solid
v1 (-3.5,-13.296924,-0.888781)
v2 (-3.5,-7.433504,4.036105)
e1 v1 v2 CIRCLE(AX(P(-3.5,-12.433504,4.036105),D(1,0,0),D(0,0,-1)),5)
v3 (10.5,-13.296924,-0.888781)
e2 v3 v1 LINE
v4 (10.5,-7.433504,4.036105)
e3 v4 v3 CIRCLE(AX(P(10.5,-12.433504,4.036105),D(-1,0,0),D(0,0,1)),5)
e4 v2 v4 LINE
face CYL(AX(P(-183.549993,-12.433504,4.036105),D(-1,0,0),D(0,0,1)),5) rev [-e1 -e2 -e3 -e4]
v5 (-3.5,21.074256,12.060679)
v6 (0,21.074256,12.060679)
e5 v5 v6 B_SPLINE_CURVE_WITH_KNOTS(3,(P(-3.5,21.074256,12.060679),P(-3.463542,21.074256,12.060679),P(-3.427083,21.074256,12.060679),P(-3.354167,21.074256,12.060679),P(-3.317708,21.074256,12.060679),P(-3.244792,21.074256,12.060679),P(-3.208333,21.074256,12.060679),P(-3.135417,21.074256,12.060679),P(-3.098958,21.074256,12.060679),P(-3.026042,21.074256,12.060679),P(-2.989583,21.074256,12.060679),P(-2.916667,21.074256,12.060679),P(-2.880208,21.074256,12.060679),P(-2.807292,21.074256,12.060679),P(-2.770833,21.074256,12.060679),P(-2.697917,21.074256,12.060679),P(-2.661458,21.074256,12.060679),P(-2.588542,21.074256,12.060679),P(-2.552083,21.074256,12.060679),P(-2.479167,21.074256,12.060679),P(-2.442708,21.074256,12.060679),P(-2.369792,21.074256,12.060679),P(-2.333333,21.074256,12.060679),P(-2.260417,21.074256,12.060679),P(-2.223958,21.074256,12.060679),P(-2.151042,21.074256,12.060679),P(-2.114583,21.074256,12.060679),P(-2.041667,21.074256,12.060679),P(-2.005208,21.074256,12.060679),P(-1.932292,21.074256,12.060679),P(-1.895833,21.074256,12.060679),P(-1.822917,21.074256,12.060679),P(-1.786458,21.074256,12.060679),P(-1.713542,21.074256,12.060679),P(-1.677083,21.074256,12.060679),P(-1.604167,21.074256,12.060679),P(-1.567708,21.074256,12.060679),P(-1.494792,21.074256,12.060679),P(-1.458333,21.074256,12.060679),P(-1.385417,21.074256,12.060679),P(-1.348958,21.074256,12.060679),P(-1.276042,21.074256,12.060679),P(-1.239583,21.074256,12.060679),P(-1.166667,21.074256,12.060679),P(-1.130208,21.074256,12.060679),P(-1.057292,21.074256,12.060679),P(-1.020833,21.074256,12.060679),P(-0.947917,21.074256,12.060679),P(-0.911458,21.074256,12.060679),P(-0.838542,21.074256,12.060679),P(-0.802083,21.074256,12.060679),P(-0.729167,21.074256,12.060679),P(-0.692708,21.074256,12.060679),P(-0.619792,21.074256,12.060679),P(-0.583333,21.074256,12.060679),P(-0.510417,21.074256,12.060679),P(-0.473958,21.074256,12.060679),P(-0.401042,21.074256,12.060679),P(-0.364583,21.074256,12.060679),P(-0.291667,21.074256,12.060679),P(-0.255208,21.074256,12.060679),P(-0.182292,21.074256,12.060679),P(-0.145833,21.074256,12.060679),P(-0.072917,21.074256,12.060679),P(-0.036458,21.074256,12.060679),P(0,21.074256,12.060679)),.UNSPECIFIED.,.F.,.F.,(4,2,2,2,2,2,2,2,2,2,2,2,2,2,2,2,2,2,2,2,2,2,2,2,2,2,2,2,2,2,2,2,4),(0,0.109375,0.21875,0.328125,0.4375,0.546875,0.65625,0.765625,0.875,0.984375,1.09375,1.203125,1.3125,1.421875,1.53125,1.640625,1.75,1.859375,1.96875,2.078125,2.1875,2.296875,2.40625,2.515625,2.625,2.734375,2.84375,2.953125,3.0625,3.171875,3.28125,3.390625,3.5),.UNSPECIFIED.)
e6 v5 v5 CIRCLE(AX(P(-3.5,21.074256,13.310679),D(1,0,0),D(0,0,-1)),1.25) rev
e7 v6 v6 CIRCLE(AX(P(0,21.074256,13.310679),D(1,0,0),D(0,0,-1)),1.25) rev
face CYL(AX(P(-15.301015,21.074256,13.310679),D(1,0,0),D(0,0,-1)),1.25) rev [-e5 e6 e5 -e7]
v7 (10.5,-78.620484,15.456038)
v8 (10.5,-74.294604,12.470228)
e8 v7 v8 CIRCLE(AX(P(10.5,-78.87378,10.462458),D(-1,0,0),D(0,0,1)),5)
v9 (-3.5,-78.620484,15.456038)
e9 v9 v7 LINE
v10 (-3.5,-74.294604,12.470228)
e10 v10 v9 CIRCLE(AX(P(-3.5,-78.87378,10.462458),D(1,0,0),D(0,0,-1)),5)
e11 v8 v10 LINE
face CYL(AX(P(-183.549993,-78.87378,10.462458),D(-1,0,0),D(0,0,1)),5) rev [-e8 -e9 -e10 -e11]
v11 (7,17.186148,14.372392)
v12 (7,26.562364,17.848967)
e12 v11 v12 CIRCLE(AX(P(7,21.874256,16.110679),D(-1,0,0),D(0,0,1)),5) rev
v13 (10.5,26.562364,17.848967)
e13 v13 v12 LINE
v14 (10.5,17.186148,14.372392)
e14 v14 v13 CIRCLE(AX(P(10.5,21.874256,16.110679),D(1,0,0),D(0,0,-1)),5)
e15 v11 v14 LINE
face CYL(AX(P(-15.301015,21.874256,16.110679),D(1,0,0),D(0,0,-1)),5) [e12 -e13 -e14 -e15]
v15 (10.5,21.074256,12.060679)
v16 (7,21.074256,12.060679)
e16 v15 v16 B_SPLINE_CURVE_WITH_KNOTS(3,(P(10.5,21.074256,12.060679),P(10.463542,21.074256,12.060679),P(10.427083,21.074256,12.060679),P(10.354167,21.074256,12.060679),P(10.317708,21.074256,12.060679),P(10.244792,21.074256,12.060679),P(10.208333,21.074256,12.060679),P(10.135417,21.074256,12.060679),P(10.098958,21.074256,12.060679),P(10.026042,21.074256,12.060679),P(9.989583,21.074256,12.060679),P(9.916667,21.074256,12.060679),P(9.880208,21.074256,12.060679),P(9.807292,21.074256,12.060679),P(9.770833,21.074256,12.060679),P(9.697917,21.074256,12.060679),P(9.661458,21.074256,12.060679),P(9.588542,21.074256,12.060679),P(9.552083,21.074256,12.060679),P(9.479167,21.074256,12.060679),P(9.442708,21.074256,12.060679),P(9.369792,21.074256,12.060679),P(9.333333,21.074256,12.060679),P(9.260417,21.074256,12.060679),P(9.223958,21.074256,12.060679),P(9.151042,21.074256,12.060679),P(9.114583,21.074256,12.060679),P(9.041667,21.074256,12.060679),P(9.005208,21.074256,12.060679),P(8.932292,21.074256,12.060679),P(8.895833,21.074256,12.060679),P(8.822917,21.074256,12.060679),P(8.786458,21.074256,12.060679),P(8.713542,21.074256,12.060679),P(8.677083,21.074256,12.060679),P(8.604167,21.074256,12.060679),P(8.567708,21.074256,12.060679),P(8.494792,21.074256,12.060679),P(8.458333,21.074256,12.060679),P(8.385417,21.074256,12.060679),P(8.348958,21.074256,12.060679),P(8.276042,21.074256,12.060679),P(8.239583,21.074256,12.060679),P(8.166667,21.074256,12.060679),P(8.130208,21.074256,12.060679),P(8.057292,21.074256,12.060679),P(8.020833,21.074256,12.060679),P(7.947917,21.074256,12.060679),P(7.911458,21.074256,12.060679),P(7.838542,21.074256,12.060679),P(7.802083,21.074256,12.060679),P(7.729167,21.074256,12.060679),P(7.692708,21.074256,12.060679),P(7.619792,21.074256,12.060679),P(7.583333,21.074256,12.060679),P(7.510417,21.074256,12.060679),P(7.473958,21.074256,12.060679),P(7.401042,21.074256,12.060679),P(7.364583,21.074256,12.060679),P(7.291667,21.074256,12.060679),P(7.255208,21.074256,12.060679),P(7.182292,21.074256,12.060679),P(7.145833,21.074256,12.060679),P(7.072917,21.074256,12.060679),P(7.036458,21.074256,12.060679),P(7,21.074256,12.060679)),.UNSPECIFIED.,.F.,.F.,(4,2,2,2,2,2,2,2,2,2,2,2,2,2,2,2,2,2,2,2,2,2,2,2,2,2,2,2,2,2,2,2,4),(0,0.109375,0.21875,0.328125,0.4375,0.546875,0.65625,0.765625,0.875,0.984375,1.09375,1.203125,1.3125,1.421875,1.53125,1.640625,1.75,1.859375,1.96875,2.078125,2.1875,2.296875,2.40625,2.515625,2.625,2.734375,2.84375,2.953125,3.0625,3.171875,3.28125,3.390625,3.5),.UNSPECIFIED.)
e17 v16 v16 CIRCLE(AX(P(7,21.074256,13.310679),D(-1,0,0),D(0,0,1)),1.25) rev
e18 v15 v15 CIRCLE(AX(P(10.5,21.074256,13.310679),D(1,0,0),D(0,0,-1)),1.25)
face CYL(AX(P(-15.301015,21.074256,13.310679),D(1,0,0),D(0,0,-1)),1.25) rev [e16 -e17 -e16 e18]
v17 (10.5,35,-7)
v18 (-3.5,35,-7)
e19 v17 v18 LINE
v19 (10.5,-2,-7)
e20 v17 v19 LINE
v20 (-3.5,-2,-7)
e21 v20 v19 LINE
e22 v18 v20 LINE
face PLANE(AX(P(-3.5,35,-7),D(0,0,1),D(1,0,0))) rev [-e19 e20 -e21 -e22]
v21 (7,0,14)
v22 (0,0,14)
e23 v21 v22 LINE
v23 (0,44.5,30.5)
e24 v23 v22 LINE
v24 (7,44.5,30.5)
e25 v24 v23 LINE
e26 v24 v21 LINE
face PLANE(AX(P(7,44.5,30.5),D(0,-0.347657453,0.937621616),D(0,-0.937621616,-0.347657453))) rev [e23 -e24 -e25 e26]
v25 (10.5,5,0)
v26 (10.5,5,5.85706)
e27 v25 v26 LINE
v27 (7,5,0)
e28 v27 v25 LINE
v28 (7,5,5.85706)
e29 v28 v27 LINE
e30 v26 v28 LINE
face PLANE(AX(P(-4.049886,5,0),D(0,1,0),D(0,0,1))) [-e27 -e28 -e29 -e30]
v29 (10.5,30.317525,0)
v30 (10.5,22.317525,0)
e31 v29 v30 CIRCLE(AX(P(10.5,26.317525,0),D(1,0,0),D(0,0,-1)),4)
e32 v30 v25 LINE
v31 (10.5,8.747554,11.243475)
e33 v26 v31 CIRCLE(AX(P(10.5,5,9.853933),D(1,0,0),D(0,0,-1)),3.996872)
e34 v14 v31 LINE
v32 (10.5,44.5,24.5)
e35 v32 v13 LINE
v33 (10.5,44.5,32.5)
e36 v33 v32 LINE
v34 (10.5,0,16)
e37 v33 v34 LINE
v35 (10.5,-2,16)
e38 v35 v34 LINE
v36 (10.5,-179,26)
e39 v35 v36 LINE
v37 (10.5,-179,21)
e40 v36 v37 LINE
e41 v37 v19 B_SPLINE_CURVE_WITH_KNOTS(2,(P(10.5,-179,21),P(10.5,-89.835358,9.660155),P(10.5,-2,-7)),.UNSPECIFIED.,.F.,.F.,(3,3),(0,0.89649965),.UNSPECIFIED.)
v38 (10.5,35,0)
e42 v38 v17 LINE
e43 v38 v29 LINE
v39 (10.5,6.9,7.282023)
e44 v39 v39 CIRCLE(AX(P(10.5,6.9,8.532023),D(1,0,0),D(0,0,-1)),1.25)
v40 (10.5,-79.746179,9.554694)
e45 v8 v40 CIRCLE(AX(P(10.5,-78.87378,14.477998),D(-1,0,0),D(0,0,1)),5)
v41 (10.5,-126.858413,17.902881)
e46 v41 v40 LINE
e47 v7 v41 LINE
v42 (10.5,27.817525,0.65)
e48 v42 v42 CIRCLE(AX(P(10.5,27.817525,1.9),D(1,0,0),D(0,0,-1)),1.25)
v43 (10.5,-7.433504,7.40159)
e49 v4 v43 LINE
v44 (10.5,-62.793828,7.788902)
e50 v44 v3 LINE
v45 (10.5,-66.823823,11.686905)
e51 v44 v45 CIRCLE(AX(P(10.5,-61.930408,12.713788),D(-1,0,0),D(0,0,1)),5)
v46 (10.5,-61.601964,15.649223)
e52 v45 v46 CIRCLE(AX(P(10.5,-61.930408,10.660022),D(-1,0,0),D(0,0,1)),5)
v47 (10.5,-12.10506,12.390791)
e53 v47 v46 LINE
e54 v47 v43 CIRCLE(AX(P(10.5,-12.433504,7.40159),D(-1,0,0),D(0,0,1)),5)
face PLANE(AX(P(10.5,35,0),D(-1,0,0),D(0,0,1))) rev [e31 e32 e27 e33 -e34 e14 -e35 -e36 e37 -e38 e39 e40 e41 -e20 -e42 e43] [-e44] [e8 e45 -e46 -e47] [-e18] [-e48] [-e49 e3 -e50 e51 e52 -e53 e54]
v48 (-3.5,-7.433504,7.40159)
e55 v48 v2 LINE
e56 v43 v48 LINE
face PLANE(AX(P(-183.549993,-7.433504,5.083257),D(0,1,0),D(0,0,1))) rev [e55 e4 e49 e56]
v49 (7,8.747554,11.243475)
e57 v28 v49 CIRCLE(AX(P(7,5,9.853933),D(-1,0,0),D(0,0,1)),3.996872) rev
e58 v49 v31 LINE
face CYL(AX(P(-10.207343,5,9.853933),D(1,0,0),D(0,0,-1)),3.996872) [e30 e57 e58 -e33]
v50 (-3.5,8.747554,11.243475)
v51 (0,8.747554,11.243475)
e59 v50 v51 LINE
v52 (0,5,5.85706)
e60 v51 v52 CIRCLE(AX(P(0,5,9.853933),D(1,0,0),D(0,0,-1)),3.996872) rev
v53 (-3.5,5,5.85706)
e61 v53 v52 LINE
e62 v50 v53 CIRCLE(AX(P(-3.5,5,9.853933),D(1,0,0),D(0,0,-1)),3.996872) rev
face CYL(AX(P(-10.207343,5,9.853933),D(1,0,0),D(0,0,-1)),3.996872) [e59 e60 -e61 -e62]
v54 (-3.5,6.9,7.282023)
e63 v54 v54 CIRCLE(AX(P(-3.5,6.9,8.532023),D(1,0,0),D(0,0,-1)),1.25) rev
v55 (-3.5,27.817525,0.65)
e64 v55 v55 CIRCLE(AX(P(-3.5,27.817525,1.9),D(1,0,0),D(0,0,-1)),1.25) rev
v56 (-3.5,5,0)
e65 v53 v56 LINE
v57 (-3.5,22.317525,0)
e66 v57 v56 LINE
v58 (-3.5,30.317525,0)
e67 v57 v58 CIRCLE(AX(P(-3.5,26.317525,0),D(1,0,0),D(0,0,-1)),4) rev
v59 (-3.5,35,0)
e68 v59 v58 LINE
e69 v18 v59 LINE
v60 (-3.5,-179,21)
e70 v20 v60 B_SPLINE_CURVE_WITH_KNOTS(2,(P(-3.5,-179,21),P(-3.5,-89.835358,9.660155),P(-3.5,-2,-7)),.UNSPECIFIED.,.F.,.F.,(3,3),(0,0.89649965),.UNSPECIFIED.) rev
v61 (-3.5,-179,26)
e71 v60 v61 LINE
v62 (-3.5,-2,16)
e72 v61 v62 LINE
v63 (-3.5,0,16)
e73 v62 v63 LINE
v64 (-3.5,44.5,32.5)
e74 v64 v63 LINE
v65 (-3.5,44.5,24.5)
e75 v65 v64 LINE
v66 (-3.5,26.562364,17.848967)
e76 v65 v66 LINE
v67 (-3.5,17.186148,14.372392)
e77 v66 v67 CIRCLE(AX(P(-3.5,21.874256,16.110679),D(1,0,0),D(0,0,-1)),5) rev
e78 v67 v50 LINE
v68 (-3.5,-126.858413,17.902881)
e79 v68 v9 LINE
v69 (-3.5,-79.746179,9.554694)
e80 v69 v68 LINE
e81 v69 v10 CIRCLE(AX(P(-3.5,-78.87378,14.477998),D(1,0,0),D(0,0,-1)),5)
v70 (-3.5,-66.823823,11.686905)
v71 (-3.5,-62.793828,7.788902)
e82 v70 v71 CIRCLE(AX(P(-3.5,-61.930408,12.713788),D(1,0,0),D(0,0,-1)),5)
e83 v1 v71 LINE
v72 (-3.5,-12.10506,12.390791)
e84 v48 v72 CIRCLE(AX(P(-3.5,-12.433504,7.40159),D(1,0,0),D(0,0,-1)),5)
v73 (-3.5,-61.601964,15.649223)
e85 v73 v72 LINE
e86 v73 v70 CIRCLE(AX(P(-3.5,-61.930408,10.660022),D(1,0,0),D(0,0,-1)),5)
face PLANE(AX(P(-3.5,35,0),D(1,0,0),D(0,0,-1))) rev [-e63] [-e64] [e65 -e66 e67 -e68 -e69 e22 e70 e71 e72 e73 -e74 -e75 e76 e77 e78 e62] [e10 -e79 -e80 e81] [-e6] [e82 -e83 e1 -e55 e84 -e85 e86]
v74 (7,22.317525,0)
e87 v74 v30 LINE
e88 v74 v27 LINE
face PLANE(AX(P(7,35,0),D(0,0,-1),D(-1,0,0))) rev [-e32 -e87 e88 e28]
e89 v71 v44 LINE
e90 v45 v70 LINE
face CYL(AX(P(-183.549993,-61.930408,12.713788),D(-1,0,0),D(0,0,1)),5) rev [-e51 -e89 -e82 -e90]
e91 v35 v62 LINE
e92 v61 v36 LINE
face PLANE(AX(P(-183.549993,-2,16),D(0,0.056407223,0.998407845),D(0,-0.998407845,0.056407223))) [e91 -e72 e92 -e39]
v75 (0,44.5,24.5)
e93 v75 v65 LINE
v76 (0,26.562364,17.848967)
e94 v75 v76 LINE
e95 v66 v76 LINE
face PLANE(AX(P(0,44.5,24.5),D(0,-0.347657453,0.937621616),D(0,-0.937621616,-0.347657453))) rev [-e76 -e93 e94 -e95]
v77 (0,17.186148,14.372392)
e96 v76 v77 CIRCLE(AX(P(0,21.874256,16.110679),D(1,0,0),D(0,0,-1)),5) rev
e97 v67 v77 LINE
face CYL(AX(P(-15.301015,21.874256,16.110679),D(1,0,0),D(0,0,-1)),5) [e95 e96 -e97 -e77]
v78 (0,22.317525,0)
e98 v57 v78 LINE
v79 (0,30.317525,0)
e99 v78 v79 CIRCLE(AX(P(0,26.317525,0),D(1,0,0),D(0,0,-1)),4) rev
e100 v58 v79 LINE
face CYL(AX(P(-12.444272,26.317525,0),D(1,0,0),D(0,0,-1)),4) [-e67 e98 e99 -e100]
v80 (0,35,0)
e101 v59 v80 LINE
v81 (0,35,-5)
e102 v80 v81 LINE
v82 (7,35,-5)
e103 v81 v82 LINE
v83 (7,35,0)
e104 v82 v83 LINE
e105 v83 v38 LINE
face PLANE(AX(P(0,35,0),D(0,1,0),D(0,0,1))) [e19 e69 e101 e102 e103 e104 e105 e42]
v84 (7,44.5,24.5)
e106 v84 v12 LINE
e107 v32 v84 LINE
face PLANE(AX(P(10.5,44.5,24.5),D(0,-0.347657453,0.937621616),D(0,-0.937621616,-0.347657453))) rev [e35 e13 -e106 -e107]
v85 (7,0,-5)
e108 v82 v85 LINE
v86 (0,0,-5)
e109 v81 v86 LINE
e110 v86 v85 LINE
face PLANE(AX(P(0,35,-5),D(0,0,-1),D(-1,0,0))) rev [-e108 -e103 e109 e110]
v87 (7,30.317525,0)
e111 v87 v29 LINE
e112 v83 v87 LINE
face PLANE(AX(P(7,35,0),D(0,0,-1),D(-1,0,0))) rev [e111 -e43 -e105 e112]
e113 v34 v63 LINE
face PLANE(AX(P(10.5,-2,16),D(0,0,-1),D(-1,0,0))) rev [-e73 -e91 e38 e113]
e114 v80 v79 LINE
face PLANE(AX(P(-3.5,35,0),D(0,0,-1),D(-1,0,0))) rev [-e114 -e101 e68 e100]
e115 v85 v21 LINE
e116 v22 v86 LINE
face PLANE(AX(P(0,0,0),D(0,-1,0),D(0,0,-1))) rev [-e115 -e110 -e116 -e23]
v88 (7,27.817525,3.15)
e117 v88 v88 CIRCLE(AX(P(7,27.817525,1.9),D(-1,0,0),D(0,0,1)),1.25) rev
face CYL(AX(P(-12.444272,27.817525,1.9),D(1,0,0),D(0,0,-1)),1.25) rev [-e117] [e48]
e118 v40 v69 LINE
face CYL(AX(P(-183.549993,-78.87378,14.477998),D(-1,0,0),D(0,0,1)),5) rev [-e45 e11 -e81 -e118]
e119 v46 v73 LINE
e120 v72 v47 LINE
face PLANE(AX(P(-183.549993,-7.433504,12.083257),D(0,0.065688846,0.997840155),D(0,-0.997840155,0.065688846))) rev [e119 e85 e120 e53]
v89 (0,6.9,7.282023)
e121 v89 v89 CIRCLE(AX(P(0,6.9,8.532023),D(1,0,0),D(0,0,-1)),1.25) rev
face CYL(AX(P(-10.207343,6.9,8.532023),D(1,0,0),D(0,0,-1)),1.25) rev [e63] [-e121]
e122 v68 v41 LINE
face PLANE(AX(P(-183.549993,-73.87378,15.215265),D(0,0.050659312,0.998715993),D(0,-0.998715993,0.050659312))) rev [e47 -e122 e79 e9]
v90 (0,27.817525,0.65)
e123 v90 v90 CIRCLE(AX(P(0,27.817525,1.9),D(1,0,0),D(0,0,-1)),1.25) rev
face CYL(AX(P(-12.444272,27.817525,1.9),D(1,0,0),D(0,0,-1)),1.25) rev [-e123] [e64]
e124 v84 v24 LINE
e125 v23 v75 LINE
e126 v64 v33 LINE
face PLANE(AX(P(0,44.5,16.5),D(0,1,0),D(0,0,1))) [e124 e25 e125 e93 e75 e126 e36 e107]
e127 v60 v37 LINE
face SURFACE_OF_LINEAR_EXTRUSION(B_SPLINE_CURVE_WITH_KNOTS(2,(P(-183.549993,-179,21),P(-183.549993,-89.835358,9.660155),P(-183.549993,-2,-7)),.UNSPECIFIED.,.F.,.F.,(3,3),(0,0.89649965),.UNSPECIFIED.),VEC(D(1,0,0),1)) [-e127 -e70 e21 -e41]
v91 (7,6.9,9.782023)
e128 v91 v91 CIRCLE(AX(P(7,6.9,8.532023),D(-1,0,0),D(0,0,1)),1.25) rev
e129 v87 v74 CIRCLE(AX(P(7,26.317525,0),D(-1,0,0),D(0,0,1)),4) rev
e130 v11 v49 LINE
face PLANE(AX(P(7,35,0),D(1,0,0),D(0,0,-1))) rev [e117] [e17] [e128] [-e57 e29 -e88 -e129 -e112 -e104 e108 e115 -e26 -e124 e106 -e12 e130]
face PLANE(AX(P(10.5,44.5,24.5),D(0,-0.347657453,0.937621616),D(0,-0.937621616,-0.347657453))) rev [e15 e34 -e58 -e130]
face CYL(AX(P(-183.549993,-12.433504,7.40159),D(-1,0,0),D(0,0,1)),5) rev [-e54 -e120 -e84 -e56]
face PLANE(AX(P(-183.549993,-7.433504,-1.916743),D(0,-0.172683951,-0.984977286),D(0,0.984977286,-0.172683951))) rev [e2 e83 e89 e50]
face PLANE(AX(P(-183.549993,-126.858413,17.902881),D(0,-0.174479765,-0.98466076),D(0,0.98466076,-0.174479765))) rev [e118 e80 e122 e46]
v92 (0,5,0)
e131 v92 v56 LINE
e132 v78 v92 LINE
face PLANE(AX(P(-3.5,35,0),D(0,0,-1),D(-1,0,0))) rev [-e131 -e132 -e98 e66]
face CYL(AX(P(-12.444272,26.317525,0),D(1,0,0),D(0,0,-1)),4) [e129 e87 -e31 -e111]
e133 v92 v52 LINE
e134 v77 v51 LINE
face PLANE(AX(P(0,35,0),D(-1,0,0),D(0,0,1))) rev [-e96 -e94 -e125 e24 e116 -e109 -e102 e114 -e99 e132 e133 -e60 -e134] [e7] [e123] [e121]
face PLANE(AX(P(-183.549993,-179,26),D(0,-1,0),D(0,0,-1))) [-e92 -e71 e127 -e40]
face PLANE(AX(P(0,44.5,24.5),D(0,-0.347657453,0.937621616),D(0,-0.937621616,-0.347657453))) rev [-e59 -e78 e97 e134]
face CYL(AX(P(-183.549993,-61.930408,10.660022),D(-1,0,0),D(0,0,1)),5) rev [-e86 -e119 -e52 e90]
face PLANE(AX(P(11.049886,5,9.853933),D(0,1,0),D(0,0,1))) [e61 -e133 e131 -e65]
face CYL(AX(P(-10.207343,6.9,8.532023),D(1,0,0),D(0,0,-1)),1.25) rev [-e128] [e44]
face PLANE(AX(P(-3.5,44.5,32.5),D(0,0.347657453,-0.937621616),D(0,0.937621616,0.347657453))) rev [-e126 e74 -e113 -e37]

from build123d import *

# Parameters (mm, degrees)
BOSS_EXTRUDE1_DEPTH  = 35
SKETCH6_W            = 14
SKETCH6_H            = 23
BOSS_EXTRUDE6_DEPTH  = 2
BOSS_EXTRUDE8_DEPTH  = 3.5
BOSS_EXTRUDE9_START  = -14
SKETCH14_R           = 1.25
BOSS_EXTRUDE9_DEPTH  = 14
BOSS_EXTRUDE10_DEPTH = 3.5
BOSS_EXTRUDE11_START = -14
SKETCH16_R           = 1.25
BOSS_EXTRUDE11_DEPTH = 14
BOSS_EXTRUDE12_START = -14
SKETCH18_R           = 1.25
BOSS_EXTRUDE12_DEPTH = 14
SKETCH19_W           = 7
SKETCH19_H           = 19
CUT_EXTRUDE5_DEPTH   = 57.095900028
SKETCH20_W           = 7
SKETCH20_H           = 47.4605099
CUT_EXTRUDE6_DEPTH   = 10
BOSS_EXTRUDE13_DEPTH = 14
FILLET1_R            = 5


with BuildPart() as part:
    # Sketch1 → Boss-Extrude1 (new body)
    with BuildSketch(Plane(origin=(0, 0, 0), x_dir=(1, 0, 0), z_dir=(0, 1, 0))):
        Polygon((7, 0), (10.5, 0), (10.5, 7), (-3.5, 7), (-3.5, 0), (0, 0), (0, 5), (7, 5), align=None)
    extrude(amount=BOSS_EXTRUDE1_DEPTH)

    # Sketch6 → Boss-Extrude6 (add)
    with BuildSketch(Plane.XZ):
        with Locations((3.5, 4.5)):
            Rectangle(SKETCH6_W, SKETCH6_H)
    extrude(amount=BOSS_EXTRUDE6_DEPTH)

    # Sweep1: sweep along a path in Sketch8
    with BuildLine(Plane(origin=(10.5, 0, 0), x_dir=(0, 0, -1), z_dir=(1, 0, 0))) as sweep1_path:
        Line((-32.5, 44.5), (-16, 0))
    # Sketch7 → Sweep1 (sweep)
    with BuildSketch(Plane(origin=(0, 0, 0), x_dir=(1, 0, 0), z_dir=(0, 1, 0))):
        Polygon((-3.5, -16), (10.5, -16), (10.5, -8), (7, -8), (7, -14), (0, -14), (0, -8), (-3.5, -8), align=None)
    sweep(path=sweep1_path.line)

    # Sketch13 → Boss-Extrude8 (add)
    with BuildSketch(Plane(origin=(10.5, 0, 0), x_dir=(0, 0, -1), z_dir=(1, 0, 0))):
        Polygon((-8, 0), (0, 0), (0, 5), (-9.853932584, 5), align=None)
    extrude(amount=-BOSS_EXTRUDE8_DEPTH)

    # Sketch14 → Boss-Extrude9 (add)
    with BuildSketch(Plane(origin=(10.5, 0, 0), x_dir=(0, 0, -1), z_dir=(1, 0, 0)).offset(BOSS_EXTRUDE9_START)):
        with BuildLine():
            Line((-9.853932584, 5), (-11.243474968, 8.747553701))
            ThreePointArc((-11.243474968, 8.747553701), (-7.571262705, 8.280915268), (-5.85706046, 5))
            Line((-5.85706046, 5), (-9.853932584, 5))
        make_face()
        with Locations((-8.532023173, 6.9)):
            Circle(SKETCH14_R, mode=Mode.SUBTRACT)
    extrude(amount=BOSS_EXTRUDE9_DEPTH)

    # Sketch15 → Boss-Extrude10 (add)
    with BuildSketch(Plane.ZY.offset(3.5)):
        Polygon((0, 0), (8, 0), (9.853932584, 5), (0, 5), align=None)
    extrude(amount=-BOSS_EXTRUDE10_DEPTH)

    # Sketch16 → Boss-Extrude11 (add)
    with BuildSketch(Plane(origin=(10.5, 0, 0), x_dir=(0, 0, -1), z_dir=(1, 0, 0)).offset(BOSS_EXTRUDE11_START)):
        with BuildLine():
            ThreePointArc((0, 30.317524518), (-4, 26.317524518), (0, 22.317524518))
            Line((0, 22.317524518), (0, 26.317524518))
            Line((0, 26.317524518), (0, 30.317524518))
        make_face()
        with Locations((-1.9, 27.817524518)):
            Circle(SKETCH16_R, mode=Mode.SUBTRACT)
    extrude(amount=BOSS_EXTRUDE11_DEPTH)

    # Sketch18 → Boss-Extrude12 (add)
    with BuildSketch(Plane(origin=(10.5, 0, 0), x_dir=(0, 0, -1), z_dir=(1, 0, 0)).offset(BOSS_EXTRUDE12_START)):
        with BuildLine():
            Line((-17.848966579, 26.562364409), (-14.372392047, 17.186148247))
            ThreePointArc((-14.372392047, 17.186148247), (-11.422571232, 23.612543594), (-17.848966579, 26.562364409))
        make_face()
        with Locations((-13.310679313, 21.074256328)):
            Circle(SKETCH18_R, mode=Mode.SUBTRACT)
    extrude(amount=BOSS_EXTRUDE12_DEPTH)

    # Sketch19 → Cut-Extrude5 (cut, through all)
    with BuildSketch(Plane(origin=(0, 0, 0), x_dir=(1, 0, 0), z_dir=(0, 1, 0))):
        with Locations((3.5, -4.5)):
            Rectangle(SKETCH19_W, SKETCH19_H)
    extrude(amount=CUT_EXTRUDE5_DEPTH, mode=Mode.SUBTRACT)

    # Sketch20 → Cut-Extrude6 (cut)
    with BuildSketch(Plane(origin=(0, -4.563596004, 12.307880133), x_dir=(-1, 0, 0), z_dir=(0, 0.3476574532100169, -0.9376216162330756))):
        with Locations((-3.5, 28.597459295)):
            Rectangle(SKETCH20_W, SKETCH20_H)
    extrude(amount=CUT_EXTRUDE6_DEPTH, mode=Mode.SUBTRACT)

    # Sketch9 → Boss-Extrude13 (add)
    with BuildSketch(Plane(origin=(10.5, 0, 0), x_dir=(0, 0, -1), z_dir=(1, 0, 0))):
        with BuildLine():
            Line((-16, -2), (-26, -179))
            Line((-26, -179), (-21, -179))
            add(Edge.make_bspline(
                [(7, -2), (-9.660155009, -89.83535791), (-21, -179)],
                knots=[0, 0, 0, 0.89649965, 0.89649965, 0.89649965], degree=2))
            Line((7, -2), (-16, -2))
        make_face()
        Polygon((-5.08325747, -7.433503799), (-12.08325747, -7.433503799), (-16, -66.930407946), (-8.514117769, -66.930407946), (1.91674253, -7.433503799), align=None, mode=Mode.SUBTRACT)
        Polygon((-12.215264572, -73.873780488), (-15.215264572, -73.873780488), (-17.9028805, -126.858413083), (-8.514117769, -73.873780488), align=None, mode=Mode.SUBTRACT)
    extrude(amount=-BOSS_EXTRUDE13_DEPTH)

    # Fillet1
    # the kernel refuses this fillet: 5 mm, written as the material it adds along each edge
    with BuildSketch(Plane(origin=(10.5, -73.873780488, 8.514117769), x_dir=(0, 0, 1), z_dir=(-1, 0, 0))) as fillet1_piece_1:
        with BuildLine():
            CenterArc((FILLET1_R * 1.19277604339, -FILLET1_R), FILLET1_R, 90, 100.048385075)
            Line((FILLET1_R * 0.208115283733, -FILLET1_R * 1.17447976499), (0, 0))
            Line((0, 0), (FILLET1_R * 1.19277604339, 0))
        make_face()
    extrude(amount=14)
    with BuildSketch(Plane(origin=(10.5, -73.873780488, 15.215264572), x_dir=(0, 0, -1), z_dir=(-1, 0, 0))) as fillet1_piece_2:
        with BuildLine():
            CenterArc((FILLET1_R * 0.950561215954, FILLET1_R), FILLET1_R, 182.903807688, 87.096192312)
            Line((-FILLET1_R * 0.048154776785, FILLET1_R * 0.949340688451), (0, 0))
            Line((0, 0), (FILLET1_R * 0.950561215954, 0))
        make_face()
    extrude(amount=14)
    with BuildSketch(Plane(origin=(10.5, -66.930407946, 16), x_dir=(0, 0, -1), z_dir=(-1, 0, 0))) as fillet1_piece_3:
        with BuildLine():
            CenterArc((FILLET1_R * 1.06799555055, -FILLET1_R), FILLET1_R, 90, 93.766405645)
            Line((FILLET1_R * 0.0701553952566, -FILLET1_R * 1.06568884601), (0, 0))
            Line((0, 0), (FILLET1_R * 1.06799555055, 0))
        make_face()
    extrude(amount=14)
    with BuildSketch(Plane(origin=(10.5, -66.930407946, 8.514117769), x_dir=(0, 0.9849772856062504, -0.17268395073006315), z_dir=(-1, 0, 0))) as fillet1_piece_4:
        with BuildLine():
            CenterArc((FILLET1_R * 0.839934139964, -FILLET1_R), FILLET1_R, 90, 80.056093562)
            Line((-FILLET1_R * 0.145043145642, -FILLET1_R * 0.82731604927), (0, 0))
            Line((0, 0), (FILLET1_R * 0.839934139964, 0))
        make_face()
    extrude(amount=14)
    with BuildSketch(Plane(origin=(10.5, -7.433503799, 12.08325747), x_dir=(0, 0, -1), z_dir=(-1, 0, 0))) as fillet1_piece_5:
        with BuildLine():
            CenterArc((FILLET1_R * 0.936333488925, FILLET1_R), FILLET1_R, 183.766405645, 86.233594355)
            Line((-FILLET1_R * 0.0615066663657, FILLET1_R * 0.934311153992), (0, 0))
            Line((0, 0), (FILLET1_R * 0.936333488925, 0))
        make_face()
    extrude(amount=14)
    with BuildSketch(Plane(origin=(10.5, -7.433503799, -1.91674253), x_dir=(0, 0, 1), z_dir=(-1, 0, 0))) as fillet1_piece_6:
        with BuildLine():
            CenterArc((FILLET1_R * 1.19056953685, -FILLET1_R), FILLET1_R, 90, 99.943906438)
            Line((FILLET1_R * 0.205592251242, -FILLET1_R * 1.17268395073), (0, 0))
            Line((0, 0), (FILLET1_R * 1.19056953685, 0))
        make_face()
    extrude(amount=14)


solid = part.part
